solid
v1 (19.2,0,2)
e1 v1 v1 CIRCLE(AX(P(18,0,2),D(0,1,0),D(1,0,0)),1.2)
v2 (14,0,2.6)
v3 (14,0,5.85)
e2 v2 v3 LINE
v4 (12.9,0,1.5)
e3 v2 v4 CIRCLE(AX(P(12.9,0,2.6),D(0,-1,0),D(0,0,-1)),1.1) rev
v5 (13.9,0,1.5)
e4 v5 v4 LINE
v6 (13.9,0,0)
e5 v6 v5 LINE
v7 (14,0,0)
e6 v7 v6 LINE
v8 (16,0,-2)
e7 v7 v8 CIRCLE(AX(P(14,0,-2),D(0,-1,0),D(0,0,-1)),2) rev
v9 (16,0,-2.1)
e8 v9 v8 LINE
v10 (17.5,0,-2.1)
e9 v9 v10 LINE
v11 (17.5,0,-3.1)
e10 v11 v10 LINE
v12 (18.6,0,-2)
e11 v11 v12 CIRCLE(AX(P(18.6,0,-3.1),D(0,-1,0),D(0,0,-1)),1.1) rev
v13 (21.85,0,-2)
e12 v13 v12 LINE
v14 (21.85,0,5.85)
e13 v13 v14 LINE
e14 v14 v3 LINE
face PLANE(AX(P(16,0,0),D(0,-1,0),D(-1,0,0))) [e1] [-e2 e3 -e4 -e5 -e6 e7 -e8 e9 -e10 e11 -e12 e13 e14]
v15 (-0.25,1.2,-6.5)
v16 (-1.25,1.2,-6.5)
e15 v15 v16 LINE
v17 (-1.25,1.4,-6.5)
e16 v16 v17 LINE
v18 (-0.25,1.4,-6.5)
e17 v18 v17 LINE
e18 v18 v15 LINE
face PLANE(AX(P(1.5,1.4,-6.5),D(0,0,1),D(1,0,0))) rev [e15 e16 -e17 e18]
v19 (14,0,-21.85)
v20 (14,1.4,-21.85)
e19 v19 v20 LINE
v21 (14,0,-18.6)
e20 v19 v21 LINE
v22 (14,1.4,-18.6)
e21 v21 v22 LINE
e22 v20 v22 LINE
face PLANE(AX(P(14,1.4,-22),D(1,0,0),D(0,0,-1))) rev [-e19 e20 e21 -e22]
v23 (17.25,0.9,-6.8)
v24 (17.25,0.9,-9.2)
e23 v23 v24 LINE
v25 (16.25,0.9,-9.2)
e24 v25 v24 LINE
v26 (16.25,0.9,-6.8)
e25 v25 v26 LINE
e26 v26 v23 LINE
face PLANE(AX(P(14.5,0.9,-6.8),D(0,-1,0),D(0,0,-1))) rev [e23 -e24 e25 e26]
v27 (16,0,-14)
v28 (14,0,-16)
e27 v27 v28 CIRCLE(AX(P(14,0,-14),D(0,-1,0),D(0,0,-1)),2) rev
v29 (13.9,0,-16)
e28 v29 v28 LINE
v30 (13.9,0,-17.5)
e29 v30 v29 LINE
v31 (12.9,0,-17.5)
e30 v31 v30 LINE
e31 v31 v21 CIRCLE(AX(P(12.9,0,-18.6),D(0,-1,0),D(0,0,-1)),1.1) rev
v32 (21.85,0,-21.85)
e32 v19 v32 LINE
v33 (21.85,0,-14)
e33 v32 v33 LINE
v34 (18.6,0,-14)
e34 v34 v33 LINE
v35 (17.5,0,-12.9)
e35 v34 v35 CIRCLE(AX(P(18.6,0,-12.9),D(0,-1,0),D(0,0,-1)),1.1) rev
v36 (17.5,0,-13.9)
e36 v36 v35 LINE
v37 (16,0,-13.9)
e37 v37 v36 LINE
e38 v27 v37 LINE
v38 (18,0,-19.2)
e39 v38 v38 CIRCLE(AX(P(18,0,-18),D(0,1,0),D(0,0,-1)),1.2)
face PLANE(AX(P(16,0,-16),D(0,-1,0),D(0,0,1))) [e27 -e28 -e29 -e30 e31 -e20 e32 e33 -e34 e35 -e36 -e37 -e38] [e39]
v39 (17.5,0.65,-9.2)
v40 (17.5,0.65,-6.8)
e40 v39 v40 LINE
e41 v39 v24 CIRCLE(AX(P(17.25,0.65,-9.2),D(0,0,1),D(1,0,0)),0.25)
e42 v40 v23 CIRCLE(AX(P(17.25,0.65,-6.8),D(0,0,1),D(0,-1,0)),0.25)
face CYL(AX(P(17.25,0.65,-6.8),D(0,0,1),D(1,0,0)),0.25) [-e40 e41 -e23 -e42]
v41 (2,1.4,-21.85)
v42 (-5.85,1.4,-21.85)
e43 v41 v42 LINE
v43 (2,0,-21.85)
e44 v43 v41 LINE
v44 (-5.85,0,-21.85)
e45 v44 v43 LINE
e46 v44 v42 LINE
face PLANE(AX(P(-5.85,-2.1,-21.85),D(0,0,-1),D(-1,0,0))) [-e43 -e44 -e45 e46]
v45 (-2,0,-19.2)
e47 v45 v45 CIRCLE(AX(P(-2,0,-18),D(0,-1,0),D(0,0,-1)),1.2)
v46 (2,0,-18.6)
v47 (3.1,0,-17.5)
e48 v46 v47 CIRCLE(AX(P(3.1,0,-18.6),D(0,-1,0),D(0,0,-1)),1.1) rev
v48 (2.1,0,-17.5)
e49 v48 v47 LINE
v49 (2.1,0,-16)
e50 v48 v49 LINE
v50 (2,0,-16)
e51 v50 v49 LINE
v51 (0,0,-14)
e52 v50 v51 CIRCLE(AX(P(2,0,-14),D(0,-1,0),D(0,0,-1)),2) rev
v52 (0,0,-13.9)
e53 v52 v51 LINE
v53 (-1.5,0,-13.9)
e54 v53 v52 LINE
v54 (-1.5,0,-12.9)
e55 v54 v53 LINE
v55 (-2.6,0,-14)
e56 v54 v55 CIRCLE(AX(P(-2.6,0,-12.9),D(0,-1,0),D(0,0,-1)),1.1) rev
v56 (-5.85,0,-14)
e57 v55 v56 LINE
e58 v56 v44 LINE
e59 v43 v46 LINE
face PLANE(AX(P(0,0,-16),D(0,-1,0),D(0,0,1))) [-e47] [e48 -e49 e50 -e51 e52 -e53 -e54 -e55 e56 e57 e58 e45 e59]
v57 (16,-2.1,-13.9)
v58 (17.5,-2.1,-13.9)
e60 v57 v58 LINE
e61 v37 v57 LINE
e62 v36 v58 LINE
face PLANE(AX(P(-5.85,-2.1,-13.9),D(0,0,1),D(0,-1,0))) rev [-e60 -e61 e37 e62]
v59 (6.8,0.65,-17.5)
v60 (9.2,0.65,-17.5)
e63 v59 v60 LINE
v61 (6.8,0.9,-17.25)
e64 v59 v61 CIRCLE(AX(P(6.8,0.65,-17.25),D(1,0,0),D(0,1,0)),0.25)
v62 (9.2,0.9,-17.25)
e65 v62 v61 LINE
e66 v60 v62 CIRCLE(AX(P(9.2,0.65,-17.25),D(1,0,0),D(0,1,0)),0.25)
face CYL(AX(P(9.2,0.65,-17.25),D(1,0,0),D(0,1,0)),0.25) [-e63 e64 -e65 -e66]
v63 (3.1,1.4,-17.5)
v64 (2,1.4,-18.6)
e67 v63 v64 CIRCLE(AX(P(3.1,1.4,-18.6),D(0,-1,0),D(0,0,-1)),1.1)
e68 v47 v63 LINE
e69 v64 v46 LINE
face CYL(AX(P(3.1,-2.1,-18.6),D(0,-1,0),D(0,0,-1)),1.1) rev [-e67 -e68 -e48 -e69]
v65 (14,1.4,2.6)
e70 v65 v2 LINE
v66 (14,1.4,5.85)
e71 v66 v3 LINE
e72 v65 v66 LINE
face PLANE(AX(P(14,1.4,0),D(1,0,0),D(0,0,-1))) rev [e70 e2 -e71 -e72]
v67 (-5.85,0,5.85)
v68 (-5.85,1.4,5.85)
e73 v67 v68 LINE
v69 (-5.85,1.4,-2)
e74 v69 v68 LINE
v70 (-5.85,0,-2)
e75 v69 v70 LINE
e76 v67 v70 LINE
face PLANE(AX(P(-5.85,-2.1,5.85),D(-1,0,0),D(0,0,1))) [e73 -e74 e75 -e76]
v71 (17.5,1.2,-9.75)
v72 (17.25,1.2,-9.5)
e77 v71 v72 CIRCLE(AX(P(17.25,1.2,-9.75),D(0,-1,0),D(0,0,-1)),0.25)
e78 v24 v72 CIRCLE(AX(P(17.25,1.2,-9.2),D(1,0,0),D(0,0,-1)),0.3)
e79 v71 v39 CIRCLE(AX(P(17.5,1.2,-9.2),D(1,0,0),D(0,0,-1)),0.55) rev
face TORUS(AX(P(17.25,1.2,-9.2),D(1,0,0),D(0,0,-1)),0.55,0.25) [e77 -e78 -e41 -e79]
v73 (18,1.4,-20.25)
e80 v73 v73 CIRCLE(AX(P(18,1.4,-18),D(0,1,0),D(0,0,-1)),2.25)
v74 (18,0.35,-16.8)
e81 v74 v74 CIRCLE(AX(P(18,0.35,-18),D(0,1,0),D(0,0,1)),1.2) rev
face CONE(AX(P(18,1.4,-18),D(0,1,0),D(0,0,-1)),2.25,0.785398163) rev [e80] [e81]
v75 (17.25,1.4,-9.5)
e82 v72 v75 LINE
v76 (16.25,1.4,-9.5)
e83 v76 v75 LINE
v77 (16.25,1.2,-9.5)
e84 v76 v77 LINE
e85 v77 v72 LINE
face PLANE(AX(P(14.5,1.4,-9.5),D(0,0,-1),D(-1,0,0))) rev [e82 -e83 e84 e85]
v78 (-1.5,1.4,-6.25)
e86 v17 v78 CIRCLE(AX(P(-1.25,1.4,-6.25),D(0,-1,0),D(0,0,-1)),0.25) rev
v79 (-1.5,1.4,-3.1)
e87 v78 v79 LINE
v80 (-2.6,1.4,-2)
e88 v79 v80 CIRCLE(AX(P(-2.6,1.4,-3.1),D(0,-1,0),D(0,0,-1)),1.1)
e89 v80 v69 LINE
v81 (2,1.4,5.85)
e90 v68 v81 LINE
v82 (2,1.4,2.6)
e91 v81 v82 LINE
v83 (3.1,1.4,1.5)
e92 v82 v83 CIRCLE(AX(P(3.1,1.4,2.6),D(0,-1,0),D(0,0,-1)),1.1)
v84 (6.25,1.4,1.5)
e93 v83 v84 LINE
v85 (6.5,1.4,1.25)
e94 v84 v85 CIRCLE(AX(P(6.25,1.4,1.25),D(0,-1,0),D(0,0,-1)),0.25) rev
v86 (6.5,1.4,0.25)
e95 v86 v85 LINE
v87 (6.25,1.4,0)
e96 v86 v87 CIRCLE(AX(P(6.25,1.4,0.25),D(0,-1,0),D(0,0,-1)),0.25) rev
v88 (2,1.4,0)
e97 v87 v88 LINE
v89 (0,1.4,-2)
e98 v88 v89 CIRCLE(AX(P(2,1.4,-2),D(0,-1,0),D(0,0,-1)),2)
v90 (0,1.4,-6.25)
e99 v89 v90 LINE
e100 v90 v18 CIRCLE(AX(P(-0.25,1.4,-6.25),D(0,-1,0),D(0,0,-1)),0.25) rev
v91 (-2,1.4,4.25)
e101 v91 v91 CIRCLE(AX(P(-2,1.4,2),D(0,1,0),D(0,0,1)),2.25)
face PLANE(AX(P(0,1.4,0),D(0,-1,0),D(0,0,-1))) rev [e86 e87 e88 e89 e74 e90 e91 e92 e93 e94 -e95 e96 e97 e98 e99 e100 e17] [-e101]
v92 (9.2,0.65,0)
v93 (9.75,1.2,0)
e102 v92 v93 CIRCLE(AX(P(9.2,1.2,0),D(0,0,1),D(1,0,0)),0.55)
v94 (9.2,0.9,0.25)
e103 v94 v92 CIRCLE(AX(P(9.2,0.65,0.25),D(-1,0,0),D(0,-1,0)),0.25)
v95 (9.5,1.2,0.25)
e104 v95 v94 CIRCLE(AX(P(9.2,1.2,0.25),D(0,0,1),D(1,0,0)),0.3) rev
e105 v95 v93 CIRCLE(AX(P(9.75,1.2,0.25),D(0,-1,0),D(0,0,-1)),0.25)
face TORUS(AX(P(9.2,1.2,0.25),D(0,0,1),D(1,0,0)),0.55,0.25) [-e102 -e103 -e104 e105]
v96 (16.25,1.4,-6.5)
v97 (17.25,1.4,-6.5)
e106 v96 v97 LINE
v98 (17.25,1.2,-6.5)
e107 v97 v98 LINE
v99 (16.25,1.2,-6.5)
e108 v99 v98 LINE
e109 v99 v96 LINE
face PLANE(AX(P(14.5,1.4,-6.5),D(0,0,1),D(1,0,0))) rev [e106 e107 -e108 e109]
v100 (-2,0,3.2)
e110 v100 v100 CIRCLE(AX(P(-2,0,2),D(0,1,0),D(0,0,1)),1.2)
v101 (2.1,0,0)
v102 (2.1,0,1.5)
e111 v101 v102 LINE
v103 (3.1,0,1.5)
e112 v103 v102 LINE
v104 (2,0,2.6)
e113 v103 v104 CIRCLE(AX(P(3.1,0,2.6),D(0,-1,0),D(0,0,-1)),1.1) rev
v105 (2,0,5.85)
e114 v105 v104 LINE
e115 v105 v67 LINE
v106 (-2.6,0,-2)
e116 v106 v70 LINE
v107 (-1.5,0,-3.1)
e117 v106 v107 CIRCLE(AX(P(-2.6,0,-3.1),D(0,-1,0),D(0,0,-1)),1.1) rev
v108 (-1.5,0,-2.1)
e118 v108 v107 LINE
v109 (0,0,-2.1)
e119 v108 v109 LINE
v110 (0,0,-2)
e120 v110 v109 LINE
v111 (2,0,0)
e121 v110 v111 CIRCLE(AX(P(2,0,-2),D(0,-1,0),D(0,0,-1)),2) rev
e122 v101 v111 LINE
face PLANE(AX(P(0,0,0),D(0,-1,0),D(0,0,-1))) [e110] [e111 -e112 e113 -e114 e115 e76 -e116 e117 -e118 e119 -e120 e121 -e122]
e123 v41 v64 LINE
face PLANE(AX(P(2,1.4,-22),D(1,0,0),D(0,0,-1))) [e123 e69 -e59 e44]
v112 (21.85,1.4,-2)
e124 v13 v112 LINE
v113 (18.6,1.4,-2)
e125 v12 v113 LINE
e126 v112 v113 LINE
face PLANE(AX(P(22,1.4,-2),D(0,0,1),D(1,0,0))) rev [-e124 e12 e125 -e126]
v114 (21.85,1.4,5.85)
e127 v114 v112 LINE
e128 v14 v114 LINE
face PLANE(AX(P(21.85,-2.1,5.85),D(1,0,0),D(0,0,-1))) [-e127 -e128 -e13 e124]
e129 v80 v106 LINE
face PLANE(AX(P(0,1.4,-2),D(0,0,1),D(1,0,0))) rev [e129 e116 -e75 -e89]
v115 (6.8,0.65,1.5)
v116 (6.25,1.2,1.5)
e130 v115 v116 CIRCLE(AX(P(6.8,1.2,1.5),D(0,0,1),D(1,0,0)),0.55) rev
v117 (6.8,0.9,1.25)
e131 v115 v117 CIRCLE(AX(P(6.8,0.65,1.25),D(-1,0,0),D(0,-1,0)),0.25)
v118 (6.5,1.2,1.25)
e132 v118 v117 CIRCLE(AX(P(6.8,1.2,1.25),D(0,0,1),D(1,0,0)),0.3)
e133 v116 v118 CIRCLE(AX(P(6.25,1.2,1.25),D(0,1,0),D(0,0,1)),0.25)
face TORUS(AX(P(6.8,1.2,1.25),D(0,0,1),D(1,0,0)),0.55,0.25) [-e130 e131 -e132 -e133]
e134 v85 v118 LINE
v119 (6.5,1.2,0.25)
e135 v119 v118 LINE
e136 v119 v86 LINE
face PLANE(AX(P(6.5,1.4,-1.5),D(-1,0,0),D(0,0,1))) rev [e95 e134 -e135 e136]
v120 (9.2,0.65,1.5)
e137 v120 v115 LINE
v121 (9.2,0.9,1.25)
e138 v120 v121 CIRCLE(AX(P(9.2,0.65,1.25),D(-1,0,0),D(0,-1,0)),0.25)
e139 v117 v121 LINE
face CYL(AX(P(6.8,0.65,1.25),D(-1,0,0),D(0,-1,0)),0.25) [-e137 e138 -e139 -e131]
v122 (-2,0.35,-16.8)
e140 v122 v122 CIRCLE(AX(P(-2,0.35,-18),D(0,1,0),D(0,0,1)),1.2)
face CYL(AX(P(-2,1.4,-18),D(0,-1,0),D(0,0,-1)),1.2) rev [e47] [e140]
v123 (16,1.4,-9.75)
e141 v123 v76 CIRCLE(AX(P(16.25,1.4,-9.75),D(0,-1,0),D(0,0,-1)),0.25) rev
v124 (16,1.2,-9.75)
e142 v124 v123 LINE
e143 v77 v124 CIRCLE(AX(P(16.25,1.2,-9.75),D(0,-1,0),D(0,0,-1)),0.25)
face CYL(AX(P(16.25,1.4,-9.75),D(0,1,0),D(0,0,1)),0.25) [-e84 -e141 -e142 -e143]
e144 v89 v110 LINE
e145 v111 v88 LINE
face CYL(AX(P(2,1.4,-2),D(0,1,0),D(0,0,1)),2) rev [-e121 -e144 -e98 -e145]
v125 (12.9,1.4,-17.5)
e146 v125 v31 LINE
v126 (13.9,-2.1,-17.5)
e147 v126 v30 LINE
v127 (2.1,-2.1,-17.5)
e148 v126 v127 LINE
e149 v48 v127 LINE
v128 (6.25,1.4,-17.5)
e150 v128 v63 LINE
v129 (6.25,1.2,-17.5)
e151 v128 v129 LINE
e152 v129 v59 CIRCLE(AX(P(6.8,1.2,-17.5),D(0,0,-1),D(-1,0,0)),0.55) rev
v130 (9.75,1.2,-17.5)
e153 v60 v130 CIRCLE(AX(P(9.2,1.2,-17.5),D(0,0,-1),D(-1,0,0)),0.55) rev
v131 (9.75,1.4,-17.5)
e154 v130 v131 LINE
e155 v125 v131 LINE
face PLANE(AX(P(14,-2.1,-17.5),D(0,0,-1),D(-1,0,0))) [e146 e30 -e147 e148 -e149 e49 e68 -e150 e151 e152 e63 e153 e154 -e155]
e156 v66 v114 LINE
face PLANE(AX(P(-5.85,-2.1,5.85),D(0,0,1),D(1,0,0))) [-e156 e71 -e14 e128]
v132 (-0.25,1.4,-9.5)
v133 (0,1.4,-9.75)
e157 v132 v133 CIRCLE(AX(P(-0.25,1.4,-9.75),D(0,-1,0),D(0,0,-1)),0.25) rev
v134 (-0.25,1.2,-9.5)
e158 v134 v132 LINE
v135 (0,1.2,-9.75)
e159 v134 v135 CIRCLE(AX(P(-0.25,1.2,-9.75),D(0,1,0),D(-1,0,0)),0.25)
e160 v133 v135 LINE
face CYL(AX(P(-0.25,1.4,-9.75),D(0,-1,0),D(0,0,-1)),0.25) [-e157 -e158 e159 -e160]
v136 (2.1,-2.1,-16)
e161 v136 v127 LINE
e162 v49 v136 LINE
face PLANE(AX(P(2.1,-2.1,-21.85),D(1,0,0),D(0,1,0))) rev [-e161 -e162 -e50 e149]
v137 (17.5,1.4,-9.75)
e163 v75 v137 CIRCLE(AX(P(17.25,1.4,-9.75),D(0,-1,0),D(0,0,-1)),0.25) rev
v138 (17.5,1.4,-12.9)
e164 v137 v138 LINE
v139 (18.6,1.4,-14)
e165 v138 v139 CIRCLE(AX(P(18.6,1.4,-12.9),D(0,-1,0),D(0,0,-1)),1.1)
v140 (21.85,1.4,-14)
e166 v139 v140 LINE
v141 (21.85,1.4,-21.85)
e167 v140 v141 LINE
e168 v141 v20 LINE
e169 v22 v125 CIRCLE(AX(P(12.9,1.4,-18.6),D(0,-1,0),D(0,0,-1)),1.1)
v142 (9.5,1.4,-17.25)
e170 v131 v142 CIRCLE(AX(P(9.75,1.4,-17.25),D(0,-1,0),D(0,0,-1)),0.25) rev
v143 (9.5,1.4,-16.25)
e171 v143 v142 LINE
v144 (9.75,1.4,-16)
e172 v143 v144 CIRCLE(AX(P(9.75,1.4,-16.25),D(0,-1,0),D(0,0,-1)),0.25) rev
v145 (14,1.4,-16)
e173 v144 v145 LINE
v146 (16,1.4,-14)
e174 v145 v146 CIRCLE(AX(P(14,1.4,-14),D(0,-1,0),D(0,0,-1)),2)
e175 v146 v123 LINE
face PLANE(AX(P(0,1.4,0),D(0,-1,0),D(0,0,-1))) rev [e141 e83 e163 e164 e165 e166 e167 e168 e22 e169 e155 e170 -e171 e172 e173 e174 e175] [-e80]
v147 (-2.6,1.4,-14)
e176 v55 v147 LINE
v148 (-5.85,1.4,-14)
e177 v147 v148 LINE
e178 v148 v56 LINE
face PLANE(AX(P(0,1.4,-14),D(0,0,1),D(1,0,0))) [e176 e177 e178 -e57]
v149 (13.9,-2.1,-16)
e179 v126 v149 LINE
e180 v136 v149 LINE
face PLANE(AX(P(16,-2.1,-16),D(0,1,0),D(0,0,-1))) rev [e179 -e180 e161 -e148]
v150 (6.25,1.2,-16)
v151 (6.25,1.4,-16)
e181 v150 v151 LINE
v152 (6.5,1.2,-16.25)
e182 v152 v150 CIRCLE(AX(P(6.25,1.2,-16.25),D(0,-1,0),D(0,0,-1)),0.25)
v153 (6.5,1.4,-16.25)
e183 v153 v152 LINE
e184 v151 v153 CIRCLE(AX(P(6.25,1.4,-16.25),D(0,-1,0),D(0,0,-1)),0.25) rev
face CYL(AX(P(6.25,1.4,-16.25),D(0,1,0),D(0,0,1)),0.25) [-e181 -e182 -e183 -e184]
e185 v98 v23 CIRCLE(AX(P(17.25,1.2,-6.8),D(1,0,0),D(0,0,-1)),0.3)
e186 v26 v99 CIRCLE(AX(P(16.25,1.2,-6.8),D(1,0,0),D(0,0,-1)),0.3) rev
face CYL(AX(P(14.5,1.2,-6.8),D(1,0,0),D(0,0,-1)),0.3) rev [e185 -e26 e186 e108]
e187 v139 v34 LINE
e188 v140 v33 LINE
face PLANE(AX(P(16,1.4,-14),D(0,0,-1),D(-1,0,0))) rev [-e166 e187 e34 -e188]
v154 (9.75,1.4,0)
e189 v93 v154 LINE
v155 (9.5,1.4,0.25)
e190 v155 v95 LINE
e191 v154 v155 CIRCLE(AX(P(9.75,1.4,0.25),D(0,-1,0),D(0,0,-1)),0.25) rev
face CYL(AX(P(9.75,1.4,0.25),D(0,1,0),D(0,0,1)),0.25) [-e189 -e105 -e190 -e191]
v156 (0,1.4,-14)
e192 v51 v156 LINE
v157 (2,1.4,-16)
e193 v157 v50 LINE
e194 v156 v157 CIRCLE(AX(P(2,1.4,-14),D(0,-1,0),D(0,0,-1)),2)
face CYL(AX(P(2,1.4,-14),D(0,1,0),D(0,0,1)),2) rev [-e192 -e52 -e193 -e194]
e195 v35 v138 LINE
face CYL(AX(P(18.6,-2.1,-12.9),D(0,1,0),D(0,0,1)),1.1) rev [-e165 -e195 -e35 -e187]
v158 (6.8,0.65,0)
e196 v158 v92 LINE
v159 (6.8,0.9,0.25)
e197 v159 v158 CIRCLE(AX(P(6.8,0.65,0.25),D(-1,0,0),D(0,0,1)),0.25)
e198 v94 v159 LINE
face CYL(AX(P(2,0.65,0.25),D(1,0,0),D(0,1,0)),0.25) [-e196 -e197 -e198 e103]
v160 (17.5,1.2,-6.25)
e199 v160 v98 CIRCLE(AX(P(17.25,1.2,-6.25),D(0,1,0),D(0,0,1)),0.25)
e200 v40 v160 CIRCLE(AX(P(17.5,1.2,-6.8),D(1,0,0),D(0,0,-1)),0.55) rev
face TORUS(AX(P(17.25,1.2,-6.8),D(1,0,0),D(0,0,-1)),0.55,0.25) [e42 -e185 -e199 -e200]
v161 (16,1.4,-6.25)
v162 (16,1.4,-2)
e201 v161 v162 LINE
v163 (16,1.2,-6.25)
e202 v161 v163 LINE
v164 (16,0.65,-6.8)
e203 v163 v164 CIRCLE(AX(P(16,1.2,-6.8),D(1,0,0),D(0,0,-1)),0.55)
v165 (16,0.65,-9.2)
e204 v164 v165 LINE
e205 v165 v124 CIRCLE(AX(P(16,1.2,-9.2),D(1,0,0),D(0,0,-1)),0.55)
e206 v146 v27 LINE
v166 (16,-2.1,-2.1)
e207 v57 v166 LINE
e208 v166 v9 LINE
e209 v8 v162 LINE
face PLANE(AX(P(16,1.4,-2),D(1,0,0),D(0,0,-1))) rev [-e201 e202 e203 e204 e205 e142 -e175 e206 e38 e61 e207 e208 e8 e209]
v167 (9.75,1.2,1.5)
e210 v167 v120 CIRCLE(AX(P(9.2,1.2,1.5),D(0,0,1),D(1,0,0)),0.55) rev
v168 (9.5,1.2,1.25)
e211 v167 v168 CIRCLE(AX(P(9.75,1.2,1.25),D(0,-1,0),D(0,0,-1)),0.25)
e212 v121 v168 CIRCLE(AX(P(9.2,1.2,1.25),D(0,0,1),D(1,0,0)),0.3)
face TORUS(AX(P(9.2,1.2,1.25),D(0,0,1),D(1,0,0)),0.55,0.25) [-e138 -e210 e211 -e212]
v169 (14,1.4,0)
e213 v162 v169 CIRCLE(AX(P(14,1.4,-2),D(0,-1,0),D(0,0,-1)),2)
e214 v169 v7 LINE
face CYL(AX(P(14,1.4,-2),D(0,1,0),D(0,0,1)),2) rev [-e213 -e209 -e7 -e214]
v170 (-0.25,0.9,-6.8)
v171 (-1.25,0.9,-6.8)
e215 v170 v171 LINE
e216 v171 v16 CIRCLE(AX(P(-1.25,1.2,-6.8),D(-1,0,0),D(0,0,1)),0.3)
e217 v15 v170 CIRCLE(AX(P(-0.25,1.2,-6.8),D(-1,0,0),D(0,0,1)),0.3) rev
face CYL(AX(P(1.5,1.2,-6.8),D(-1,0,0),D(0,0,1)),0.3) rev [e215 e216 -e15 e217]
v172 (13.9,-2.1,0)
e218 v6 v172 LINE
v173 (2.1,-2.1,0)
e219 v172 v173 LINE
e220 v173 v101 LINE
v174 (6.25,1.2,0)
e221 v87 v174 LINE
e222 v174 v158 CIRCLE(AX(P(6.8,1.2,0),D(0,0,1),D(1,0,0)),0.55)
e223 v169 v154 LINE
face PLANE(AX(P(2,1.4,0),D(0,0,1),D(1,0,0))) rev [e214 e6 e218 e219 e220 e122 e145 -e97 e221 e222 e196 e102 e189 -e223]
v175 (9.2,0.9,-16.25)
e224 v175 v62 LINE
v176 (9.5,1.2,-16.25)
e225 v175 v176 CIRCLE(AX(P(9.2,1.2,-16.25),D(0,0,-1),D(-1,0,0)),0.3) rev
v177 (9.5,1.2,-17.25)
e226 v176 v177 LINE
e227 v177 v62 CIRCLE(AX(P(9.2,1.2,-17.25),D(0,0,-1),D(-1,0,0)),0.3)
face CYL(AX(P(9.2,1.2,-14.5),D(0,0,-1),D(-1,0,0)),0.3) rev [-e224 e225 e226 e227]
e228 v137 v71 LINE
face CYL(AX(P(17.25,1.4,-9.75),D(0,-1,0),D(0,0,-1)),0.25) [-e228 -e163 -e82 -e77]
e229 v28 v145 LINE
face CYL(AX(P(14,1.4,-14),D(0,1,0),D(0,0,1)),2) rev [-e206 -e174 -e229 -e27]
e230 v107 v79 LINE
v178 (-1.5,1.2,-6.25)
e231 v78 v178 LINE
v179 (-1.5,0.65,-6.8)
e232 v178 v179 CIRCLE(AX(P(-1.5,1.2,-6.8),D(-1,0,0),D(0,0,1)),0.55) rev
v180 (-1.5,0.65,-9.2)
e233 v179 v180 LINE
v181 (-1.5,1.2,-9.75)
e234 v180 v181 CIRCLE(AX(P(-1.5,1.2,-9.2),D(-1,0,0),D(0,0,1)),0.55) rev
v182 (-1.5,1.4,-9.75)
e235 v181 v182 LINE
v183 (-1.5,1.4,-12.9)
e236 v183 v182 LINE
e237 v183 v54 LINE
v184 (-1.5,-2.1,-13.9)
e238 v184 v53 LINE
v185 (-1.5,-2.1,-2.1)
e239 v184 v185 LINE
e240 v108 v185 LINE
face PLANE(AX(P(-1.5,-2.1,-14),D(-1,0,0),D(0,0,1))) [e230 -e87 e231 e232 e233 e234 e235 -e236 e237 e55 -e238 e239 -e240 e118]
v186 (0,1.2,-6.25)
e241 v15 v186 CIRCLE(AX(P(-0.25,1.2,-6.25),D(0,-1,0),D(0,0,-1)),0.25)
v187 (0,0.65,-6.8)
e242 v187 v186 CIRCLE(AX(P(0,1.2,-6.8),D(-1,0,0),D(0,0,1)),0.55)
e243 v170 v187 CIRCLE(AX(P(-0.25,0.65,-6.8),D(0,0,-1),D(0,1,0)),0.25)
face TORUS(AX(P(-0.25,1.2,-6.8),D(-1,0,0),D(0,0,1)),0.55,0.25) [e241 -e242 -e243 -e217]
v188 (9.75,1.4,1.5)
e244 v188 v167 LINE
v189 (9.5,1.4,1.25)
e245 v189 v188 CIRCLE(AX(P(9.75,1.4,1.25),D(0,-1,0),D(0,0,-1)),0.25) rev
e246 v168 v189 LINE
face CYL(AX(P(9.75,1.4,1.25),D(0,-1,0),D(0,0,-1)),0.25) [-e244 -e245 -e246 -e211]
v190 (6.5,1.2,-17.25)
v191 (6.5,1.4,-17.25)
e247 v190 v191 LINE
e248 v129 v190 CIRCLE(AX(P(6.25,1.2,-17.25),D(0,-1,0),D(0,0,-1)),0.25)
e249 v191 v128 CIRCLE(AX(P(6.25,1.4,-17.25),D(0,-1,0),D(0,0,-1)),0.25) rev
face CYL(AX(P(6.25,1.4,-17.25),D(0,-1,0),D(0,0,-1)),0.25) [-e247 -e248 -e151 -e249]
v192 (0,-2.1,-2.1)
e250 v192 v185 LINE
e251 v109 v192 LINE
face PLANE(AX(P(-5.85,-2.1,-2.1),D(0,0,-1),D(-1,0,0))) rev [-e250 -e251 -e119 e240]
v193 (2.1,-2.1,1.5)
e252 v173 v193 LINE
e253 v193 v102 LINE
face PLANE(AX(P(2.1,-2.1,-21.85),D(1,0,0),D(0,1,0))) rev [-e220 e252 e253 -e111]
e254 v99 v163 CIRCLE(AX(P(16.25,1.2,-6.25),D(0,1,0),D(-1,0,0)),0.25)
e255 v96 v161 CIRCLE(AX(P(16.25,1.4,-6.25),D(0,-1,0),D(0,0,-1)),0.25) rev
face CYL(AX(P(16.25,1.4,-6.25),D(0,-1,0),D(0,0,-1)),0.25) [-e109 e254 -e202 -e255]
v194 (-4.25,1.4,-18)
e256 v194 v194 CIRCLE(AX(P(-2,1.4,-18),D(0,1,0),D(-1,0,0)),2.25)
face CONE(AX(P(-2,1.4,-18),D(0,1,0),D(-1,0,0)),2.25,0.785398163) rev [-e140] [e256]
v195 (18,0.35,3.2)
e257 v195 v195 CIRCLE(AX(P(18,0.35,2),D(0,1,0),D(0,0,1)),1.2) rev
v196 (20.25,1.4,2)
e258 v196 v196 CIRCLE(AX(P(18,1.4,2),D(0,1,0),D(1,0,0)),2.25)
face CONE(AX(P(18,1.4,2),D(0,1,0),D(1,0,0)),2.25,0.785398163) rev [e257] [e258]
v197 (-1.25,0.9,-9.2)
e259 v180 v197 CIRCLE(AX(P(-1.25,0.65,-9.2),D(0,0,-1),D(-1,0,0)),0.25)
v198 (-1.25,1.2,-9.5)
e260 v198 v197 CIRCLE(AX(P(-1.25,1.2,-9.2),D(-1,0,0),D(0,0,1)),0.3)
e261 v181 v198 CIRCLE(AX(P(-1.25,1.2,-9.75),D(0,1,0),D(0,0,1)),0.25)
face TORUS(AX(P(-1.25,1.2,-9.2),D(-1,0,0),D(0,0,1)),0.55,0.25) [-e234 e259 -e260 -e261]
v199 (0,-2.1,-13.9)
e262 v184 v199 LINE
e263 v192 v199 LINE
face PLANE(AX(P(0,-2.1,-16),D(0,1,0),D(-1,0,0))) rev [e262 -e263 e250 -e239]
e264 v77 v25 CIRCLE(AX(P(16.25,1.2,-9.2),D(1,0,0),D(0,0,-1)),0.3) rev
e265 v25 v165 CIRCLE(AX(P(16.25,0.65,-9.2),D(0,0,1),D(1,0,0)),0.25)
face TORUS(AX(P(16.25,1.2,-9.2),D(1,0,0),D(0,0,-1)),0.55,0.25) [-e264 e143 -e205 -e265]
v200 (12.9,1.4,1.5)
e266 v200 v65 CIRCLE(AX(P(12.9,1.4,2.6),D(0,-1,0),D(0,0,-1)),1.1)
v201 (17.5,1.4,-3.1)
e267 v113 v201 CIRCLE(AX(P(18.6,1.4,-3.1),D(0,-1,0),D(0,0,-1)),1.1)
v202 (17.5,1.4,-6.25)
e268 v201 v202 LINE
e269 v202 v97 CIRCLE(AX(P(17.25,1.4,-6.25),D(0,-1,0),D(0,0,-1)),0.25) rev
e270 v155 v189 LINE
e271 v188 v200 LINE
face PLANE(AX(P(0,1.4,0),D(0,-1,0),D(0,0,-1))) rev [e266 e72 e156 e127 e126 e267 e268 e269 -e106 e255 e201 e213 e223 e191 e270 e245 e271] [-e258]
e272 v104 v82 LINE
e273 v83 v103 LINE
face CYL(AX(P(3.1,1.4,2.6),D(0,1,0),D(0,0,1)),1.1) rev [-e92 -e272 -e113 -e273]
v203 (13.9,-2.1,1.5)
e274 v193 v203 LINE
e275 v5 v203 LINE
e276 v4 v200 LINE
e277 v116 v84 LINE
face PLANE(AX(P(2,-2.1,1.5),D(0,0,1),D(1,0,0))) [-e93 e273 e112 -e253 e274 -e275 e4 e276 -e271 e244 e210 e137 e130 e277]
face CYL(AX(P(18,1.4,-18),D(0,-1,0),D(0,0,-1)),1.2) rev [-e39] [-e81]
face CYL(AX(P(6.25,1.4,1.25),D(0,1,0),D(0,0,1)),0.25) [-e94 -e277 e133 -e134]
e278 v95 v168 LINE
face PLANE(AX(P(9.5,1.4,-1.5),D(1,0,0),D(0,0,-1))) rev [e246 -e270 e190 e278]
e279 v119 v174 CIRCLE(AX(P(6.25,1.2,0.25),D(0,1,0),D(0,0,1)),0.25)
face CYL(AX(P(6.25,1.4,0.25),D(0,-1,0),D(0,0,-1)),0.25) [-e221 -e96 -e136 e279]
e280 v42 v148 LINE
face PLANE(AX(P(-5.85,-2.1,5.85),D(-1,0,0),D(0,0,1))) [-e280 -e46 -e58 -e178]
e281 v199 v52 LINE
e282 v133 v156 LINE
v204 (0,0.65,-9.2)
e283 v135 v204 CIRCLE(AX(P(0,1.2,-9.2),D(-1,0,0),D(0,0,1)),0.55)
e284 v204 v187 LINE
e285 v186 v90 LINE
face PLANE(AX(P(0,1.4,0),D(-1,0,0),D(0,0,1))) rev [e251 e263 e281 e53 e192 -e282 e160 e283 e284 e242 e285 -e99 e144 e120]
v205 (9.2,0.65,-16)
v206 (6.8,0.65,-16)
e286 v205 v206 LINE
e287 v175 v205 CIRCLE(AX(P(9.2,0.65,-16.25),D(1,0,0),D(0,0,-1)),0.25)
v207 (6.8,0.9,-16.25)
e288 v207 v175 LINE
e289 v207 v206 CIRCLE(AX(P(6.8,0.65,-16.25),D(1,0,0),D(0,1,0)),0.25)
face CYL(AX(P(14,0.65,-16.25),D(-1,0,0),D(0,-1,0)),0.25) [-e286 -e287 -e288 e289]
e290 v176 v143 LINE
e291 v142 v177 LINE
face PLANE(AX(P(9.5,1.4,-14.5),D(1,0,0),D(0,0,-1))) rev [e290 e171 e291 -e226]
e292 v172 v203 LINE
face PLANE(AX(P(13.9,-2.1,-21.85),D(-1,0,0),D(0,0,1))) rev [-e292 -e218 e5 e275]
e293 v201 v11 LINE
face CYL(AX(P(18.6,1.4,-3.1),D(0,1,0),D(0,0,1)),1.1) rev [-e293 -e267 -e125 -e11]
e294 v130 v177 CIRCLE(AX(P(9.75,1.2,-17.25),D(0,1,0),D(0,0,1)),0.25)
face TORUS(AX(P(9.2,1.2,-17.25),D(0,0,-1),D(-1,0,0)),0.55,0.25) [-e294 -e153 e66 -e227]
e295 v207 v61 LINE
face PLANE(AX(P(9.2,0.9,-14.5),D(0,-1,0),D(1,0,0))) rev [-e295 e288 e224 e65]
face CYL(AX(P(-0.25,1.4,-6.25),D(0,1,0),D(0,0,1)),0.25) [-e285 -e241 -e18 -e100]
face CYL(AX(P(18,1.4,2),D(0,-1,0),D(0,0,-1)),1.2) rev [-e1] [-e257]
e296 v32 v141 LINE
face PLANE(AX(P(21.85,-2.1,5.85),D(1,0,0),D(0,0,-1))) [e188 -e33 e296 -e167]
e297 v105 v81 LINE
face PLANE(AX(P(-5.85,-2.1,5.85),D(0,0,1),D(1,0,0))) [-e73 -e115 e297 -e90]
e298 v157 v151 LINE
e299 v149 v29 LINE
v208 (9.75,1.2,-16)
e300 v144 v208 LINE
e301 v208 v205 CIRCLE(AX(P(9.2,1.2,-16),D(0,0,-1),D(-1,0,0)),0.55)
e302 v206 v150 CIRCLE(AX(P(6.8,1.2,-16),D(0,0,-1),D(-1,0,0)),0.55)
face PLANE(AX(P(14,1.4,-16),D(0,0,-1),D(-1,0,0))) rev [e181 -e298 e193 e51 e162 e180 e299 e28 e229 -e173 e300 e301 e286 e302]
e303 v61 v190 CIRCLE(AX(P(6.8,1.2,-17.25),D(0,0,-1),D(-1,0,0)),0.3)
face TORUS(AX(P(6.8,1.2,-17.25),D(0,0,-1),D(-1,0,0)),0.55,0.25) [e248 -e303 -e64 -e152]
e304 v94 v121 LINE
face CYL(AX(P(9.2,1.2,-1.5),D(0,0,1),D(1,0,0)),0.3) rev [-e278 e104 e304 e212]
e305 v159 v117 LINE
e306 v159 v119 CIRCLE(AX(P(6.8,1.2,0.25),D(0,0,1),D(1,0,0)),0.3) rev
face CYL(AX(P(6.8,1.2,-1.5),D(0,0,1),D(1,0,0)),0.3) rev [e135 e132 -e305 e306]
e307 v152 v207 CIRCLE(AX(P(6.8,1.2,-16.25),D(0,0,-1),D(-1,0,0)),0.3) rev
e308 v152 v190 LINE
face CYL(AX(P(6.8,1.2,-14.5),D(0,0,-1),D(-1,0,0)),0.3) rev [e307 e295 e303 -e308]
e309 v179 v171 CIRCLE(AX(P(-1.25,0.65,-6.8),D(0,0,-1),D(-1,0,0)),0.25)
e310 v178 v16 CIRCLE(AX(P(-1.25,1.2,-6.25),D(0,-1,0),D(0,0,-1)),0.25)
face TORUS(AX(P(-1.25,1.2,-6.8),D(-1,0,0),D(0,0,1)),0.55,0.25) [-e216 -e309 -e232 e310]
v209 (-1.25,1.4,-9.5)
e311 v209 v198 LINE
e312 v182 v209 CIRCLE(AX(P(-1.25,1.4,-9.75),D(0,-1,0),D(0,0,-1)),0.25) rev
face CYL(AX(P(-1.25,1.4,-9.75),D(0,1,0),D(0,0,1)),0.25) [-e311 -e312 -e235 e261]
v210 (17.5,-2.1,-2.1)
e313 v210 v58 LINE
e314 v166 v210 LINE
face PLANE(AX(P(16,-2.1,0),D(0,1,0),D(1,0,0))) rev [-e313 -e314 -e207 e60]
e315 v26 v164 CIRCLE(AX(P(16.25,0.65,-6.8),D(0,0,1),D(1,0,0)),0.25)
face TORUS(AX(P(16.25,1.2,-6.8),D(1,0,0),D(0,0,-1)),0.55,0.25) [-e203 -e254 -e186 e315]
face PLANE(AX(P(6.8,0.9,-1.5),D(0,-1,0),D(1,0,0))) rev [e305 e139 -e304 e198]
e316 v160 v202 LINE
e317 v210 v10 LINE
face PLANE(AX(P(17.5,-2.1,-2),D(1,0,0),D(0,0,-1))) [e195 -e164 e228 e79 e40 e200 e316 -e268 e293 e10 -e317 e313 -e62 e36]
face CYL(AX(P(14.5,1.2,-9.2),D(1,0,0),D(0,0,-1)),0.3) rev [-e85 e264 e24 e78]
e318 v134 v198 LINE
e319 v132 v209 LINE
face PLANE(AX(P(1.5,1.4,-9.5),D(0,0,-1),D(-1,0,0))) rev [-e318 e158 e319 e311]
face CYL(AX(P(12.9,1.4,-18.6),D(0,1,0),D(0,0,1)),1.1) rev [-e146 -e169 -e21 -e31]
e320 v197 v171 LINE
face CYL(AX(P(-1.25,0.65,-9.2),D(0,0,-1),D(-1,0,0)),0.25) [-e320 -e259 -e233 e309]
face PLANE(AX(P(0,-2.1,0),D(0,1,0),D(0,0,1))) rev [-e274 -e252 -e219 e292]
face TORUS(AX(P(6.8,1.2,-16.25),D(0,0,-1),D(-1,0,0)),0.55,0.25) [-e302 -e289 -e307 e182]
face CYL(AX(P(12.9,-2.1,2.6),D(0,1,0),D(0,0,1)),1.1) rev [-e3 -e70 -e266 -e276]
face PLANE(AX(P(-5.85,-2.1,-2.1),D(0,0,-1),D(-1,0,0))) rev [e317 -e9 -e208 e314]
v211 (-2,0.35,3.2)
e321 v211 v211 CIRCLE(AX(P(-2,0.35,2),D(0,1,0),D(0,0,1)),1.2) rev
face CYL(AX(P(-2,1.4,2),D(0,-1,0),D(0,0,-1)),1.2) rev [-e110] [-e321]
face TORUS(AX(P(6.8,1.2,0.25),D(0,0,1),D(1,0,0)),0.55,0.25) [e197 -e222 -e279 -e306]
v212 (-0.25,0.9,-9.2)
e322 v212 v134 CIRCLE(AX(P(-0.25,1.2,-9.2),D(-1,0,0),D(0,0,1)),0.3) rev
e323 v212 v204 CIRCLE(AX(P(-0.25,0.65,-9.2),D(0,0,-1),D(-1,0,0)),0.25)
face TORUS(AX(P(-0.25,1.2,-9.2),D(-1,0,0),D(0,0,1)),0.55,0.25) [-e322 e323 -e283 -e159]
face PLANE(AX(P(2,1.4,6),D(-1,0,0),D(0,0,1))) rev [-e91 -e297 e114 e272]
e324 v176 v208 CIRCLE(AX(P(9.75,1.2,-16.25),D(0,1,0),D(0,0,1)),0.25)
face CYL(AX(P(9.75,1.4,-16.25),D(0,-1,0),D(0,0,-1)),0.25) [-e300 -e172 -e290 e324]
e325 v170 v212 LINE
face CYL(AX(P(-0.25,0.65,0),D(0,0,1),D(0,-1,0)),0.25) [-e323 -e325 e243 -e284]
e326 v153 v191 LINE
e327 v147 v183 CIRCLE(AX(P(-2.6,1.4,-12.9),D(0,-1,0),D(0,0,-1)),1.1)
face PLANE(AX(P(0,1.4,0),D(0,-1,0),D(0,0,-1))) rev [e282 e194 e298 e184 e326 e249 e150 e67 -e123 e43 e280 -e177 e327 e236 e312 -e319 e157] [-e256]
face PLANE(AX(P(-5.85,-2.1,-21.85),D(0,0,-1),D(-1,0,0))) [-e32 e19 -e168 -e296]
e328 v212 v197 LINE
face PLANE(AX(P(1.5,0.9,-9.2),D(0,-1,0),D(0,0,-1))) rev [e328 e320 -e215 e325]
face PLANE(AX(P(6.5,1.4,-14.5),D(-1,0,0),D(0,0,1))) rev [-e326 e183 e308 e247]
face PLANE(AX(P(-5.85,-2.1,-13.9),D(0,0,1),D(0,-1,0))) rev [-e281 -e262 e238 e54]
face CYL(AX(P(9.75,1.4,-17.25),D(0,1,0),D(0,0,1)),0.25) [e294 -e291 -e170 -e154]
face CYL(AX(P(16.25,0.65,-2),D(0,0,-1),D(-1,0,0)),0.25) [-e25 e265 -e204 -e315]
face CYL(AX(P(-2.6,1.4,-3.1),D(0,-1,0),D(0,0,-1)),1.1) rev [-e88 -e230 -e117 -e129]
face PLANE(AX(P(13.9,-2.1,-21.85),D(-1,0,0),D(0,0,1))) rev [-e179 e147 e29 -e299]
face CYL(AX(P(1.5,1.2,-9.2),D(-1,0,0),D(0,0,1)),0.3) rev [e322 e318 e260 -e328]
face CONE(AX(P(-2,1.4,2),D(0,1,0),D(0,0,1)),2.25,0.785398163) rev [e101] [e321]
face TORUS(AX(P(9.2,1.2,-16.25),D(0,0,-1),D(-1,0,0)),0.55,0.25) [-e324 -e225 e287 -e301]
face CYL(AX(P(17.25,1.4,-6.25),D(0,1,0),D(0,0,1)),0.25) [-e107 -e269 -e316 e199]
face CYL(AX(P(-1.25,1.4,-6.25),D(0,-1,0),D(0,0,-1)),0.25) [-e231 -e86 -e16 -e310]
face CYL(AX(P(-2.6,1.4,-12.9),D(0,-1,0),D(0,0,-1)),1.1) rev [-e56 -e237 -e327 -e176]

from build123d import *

# Parameters (mm, degrees)
SKETCH1_R                   = 1.2
BOSS_EXTRUDE1_DEPTH         = 1.4
SKETCH2_R                   = 2.25
CUT_EXTRUDE1_DEPTH          = 1.1
CUT_EXTRUDE1_DRAFT          = -45
SKETCH3_W                   = 12
SKETCH3_H                   = 1.5
BOSS_EXTRUDE2_DEPTH         = 3.5
CIRPATTERN1_COUNT           = 2
CIRPATTERN1_ANGLE           = 90
CIRPATTERN1_COPY_1_SKETCH_R = 2.25
CIRPATTERN1_COPY_1_DEPTH    = 1.1
CIRPATTERN1_COPY_1_DRAFT    = -45
CIRPATTERN2_START           = -14
CIRPATTERN2_OUTLINE_W       = 1.5
CIRPATTERN2_OUTLINE_H       = 3.5
CIRPATTERN2_DEPTH           = 12
CIRPATTERN2_2_OUTLINE_R     = 1.2
CIRPATTERN2_2_DEPTH         = 1.4
CIRPATTERN2_START_2         = -2.1
CIRPATTERN2_3_OUTLINE_W     = 12
CIRPATTERN2_3_OUTLINE_H     = 1.5
CIRPATTERN2_3_DEPTH         = 2.1
CIRPATTERN3_COPY_1_SKETCH_R = 2.25
CIRPATTERN3_COPY_1_DEPTH    = 1.1
CIRPATTERN3_COPY_1_DRAFT    = -45
CIRPATTERN3_COPY_2_SKETCH_R = 2.25
CIRPATTERN3_COPY_2_DEPTH    = 1.1
CIRPATTERN3_COPY_2_DRAFT    = -45
CIRPATTERN3_COPY_3_SKETCH_R = 2.25
CIRPATTERN3_COPY_3_DEPTH    = 1.1
CIRPATTERN3_COPY_3_DRAFT    = -45
CUT_EXTRUDE2_DEPTH          = 3
CIRPATTERN4_COUNT           = 4
FILLET2_R                   = 0.25
CUT_EXTRUDE3_DEPTH          = 32.183489221
CUT_EXTRUDE3_DEPTH_BACK     = 32.183489221
SKETCH5_W                   = 28
SKETCH5_H                   = 28
SKETCH5_W_2                 = 27.7
SKETCH5_H_2                 = 27.7
FILLET3_R                   = 2
FILLET4_R                   = 1.1
CUT_EXTRUDE4_DEPTH          = 31.97184205
CUT_EXTRUDE4_DEPTH_BACK     = 31.97184205
SKETCH6_W                   = 0.1
SKETCH6_H                   = 2.1
CUT_EXTRUDE5_DEPTH          = 31.97184205
CUT_EXTRUDE5_DEPTH_BACK     = 31.97184205
SKETCH7_W                   = 0.1
SKETCH7_H                   = 2.1


# Read off the part's stored shape, not the designer's step: CirPattern2
with BuildPart() as part:
    # Sketch1 → Boss-Extrude1 (new body)
    with BuildSketch(Plane(origin=(0, 0, 0), x_dir=(1, 0, 0), z_dir=(0, 1, 0))):
        Polygon((0, 0), (0, 2), (-6, 2), (-6, -6), (2, -6), (2, 0), align=None)
        with Locations(Location((-2, -2, 0), (0, 0, 270))):
            Circle(SKETCH1_R, mode=Mode.SUBTRACT)
    boss_extrude1 = extrude(amount=BOSS_EXTRUDE1_DEPTH)


with BuildPart() as cut_extrude1_tool:
    # Sketch2 → Cut-Extrude1 (with draft: the straight prism first)
    with BuildSketch(Plane(origin=(0, 1.4, 0), x_dir=(1, 0, 0), z_dir=(0, 1, 0))):
        with Locations((-2, -2)):
            Circle(SKETCH2_R)
    extrude(amount=-CUT_EXTRUDE1_DEPTH)
    # Cut-Extrude1: the draft: its side faces are tilted about the plane it starts from
    cut_extrude1_sides = [cut_extrude1_tool.faces().sort_by_distance(p)[0] for p in [
        (-4.25, 0.85, 2),
    ]]
    draft(cut_extrude1_sides, Plane(origin=(0, 1.4, 0), x_dir=(1, 0, 0), z_dir=(0, 1, 0)), CUT_EXTRUDE1_DRAFT)


with BuildPart() as part_1:
    add(part.part)

    # Cut-Extrude1: cut by cut_extrude1_tool
    add(cut_extrude1_tool.part, mode=Mode.SUBTRACT)

    # Sketch3 → Boss-Extrude2 (add)
    with BuildSketch(Plane(origin=(0, 1.4, 0), x_dir=(1, 0, 0), z_dir=(0, 1, 0))):
        with Locations((8, -0.75)):
            Rectangle(SKETCH3_W, SKETCH3_H)
    boss_extrude2 = extrude(amount=-BOSS_EXTRUDE2_DEPTH)

    # CirPattern1: Boss-Extrude1, Boss-Extrude2 ×2 about axis
    cirpattern1_axis = Axis((8, 0, -8), (0, 1, 0))
    add([boss_extrude1.rotate(cirpattern1_axis, i * CIRPATTERN1_ANGLE / (CIRPATTERN1_COUNT - 1)) for i in range(1, CIRPATTERN1_COUNT)])
    add([boss_extrude2.rotate(cirpattern1_axis, i * CIRPATTERN1_ANGLE / (CIRPATTERN1_COUNT - 1)) for i in range(1, CIRPATTERN1_COUNT)])


with BuildPart() as cirpattern1_copy_1_tool:
    # CirPattern1 copy 1 sketch → CirPattern1 copy 1 (with draft: the straight prism first)
    with BuildSketch(Plane(origin=(16, 1.4, 0), x_dir=(0, 0, -1), z_dir=(0, 1, 0))):
        with Locations((-2, -2)):
            Circle(CIRPATTERN1_COPY_1_SKETCH_R)
    extrude(amount=-CIRPATTERN1_COPY_1_DEPTH)
    # CirPattern1 copy 1: the draft: its side faces are tilted about the plane it starts from
    cirpattern1_copy_1_sides = [cirpattern1_copy_1_tool.faces().sort_by_distance(p)[0] for p in [
        (18, 0.85, 4.25),
    ]]
    draft(cirpattern1_copy_1_sides, Plane(origin=(16, 1.4, 0), x_dir=(0, 0, -1), z_dir=(0, 1, 0)), CIRPATTERN1_COPY_1_DRAFT)


with BuildPart() as part_2:
    add(part_1.part)

    # CirPattern1 copy 1: cut by cirpattern1_copy_1_tool
    add(cirpattern1_copy_1_tool.part, mode=Mode.SUBTRACT)

    # CirPattern2 outline → CirPattern2 (add)
    with BuildSketch(Plane.XY.offset(CIRPATTERN2_START)):
        with Locations((-0.75, -0.35)):
            Rectangle(CIRPATTERN2_OUTLINE_W, CIRPATTERN2_OUTLINE_H)
    extrude(amount=CIRPATTERN2_DEPTH)

    # CirPattern2 2 outline → CirPattern2 2 (add)
    with BuildSketch(Plane(origin=(0, 0, 0), x_dir=(1, 0, 0), z_dir=(0, 1, 0))):
        Polygon((2, 16), (16, 16), (16, 14), (22, 14), (22, 22), (14, 22), (14, 17.5), (2, 17.5), align=None)
        with Locations((18, 18)):
            Circle(CIRPATTERN2_2_OUTLINE_R, mode=Mode.SUBTRACT)
    extrude(amount=CIRPATTERN2_2_DEPTH)

    # CirPattern2 3 outline → CirPattern2 3 (add)
    with BuildSketch(Plane(origin=(0, 0, 0), x_dir=(1, 0, 0), z_dir=(0, 1, 0)).offset(CIRPATTERN2_START_2)):
        with Locations((8, 16.75)):
            Rectangle(CIRPATTERN2_3_OUTLINE_W, CIRPATTERN2_3_OUTLINE_H)
    extrude(amount=CIRPATTERN2_3_DEPTH)

    # CirPattern2 4 outline → CirPattern2 4 (revolve)
    with BuildSketch(Plane(origin=(18, 0, 2), x_dir=(1, 0, 0), z_dir=(0, 0, 1))):
        Polygon((1.2, 1.4), (1.2, 0.35), (2.25, 1.4), align=None)
    revolve(axis=Axis((18, 0, 2), (0, 1, 0)))

    # Mirror1: Boss-Extrude1 across plane
    add(boss_extrude1.mirror(Plane(origin=(0, 0, -8), x_dir=(1, 0, 0), z_dir=(0, 0, -1))))


with BuildPart() as cirpattern3_copy_1_tool:
    # CirPattern3 copy 1 sketch → CirPattern3 copy 1 (with draft: the straight prism first)
    with BuildSketch(Plane(origin=(16, 1.4, 0), x_dir=(0, 0, -1), z_dir=(0, 1, 0))):
        with Locations((-2, -2)):
            Circle(CIRPATTERN3_COPY_1_SKETCH_R)
    extrude(amount=-CIRPATTERN3_COPY_1_DEPTH)
    # CirPattern3 copy 1: the draft: its side faces are tilted about the plane it starts from
    cirpattern3_copy_1_sides = [cirpattern3_copy_1_tool.faces().sort_by_distance(p)[0] for p in [
        (18, 0.85, 4.25),
    ]]
    draft(cirpattern3_copy_1_sides, Plane(origin=(16, 1.4, 0), x_dir=(0, 0, -1), z_dir=(0, 1, 0)), CIRPATTERN3_COPY_1_DRAFT)


with BuildPart() as part_3:
    add(part_2.part)

    # CirPattern3 copy 1: cut by cirpattern3_copy_1_tool
    add(cirpattern3_copy_1_tool.part, mode=Mode.SUBTRACT)


with BuildPart() as cirpattern3_copy_2_tool:
    # CirPattern3 copy 2 sketch → CirPattern3 copy 2 (with draft: the straight prism first)
    with BuildSketch(Plane(origin=(16, 1.4, -16), x_dir=(-1, 0, 0), z_dir=(0, 1, 0))):
        with Locations((-2, -2)):
            Circle(CIRPATTERN3_COPY_2_SKETCH_R)
    extrude(amount=-CIRPATTERN3_COPY_2_DEPTH)
    # CirPattern3 copy 2: the draft: its side faces are tilted about the plane it starts from
    cirpattern3_copy_2_sides = [cirpattern3_copy_2_tool.faces().sort_by_distance(p)[0] for p in [
        (20.25, 0.85, -18),
    ]]
    draft(cirpattern3_copy_2_sides, Plane(origin=(16, 1.4, -16), x_dir=(-1, 0, 0), z_dir=(0, 1, 0)), CIRPATTERN3_COPY_2_DRAFT)


with BuildPart() as part_4:
    add(part_3.part)

    # CirPattern3 copy 2: cut by cirpattern3_copy_2_tool
    add(cirpattern3_copy_2_tool.part, mode=Mode.SUBTRACT)


with BuildPart() as cirpattern3_copy_3_tool:
    # CirPattern3 copy 3 sketch → CirPattern3 copy 3 (with draft: the straight prism first)
    with BuildSketch(Plane(origin=(0, 1.4, -16), x_dir=(0, 0, 1), z_dir=(0, 1, 0))):
        with Locations((-2, -2)):
            Circle(CIRPATTERN3_COPY_3_SKETCH_R)
    extrude(amount=-CIRPATTERN3_COPY_3_DEPTH)
    # CirPattern3 copy 3: the draft: its side faces are tilted about the plane it starts from
    cirpattern3_copy_3_sides = [cirpattern3_copy_3_tool.faces().sort_by_distance(p)[0] for p in [
        (-2, 0.85, -20.25),
    ]]
    draft(cirpattern3_copy_3_sides, Plane(origin=(0, 1.4, -16), x_dir=(0, 0, 1), z_dir=(0, 1, 0)), CIRPATTERN3_COPY_3_DRAFT)


with BuildPart() as part_5:
    add(part_4.part)

    # CirPattern3 copy 3: cut by cirpattern3_copy_3_tool
    add(cirpattern3_copy_3_tool.part, mode=Mode.SUBTRACT)

    # Sketch4 → Cut-Extrude2 (cut)
    with BuildSketch(Plane.XY.offset(1.5)):
        with BuildLine():
            Line((6.5, 1.4), (9.5, 1.4))
            Line((9.5, 1.4), (9.5, 1.2))
            ThreePointArc((9.5, 1.2), (9.412132034, 0.987867966), (9.2, 0.9))
            Line((9.2, 0.9), (6.8, 0.9))
            ThreePointArc((6.8, 0.9), (6.587867966, 0.987867966), (6.5, 1.2))
            Line((6.5, 1.2), (6.5, 1.4))
        make_face()
    cut_extrude2 = extrude(amount=-CUT_EXTRUDE2_DEPTH, mode=Mode.SUBTRACT)

    # CirPattern4: Cut-Extrude2 ×4 about axis
    cirpattern4_axis = Axis((8, 0, -8), (0, 1, 0))
    for i in range(1, CIRPATTERN4_COUNT):
        add(cut_extrude2.rotate(cirpattern4_axis, i * 360 / CIRPATTERN4_COUNT), mode=Mode.SUBTRACT)

    # Fillet2
    fillet2_edges = [part_5.edges().sort_by_distance(p)[0] for p in [
        (6.5, 1.3, 0),
        (9.5, 1.3, 0),
        (9.412132034, 0.987867966, 0),
        (8, 0.9, 0),
        (6.587867966, 0.987867966, 0),
        (6.5, 1.3, 1.5),
        (6.587867966, 0.987867966, 1.5),
        (8, 0.9, 1.5),
        (9.412132034, 0.987867966, 1.5),
        (9.5, 1.3, 1.5),
        (16, 1.3, -6.5),
        (16, 1.3, -9.5),
        (16, 0.987867966, -9.412132034),
        (16, 0.9, -8),
        (16, 0.987867966, -6.587867966),
        (17.5, 1.3, -6.5),
        (17.5, 0.987867966, -6.587867966),
        (17.5, 0.9, -8),
        (17.5, 0.987867966, -9.412132034),
        (17.5, 1.3, -9.5),
        (9.5, 1.3, -16),
        (6.5, 1.3, -16),
        (6.587867966, 0.987867966, -16),
        (8, 0.9, -16),
        (9.412132034, 0.987867966, -16),
        (9.5, 1.3, -17.5),
        (9.412132034, 0.987867966, -17.5),
        (8, 0.9, -17.5),
        (6.587867966, 0.987867966, -17.5),
        (6.5, 1.3, -17.5),
        (0, 1.3, -9.5),
        (0, 1.3, -6.5),
        (0, 0.987867966, -6.587867966),
        (0, 0.9, -8),
        (0, 0.987867966, -9.412132034),
        (-1.5, 1.3, -9.5),
        (-1.5, 0.987867966, -9.412132034),
        (-1.5, 0.9, -8),
        (-1.5, 0.987867966, -6.587867966),
        (-1.5, 1.3, -6.5),
    ]]
    fillet(fillet2_edges, radius=FILLET2_R)

    # Sketch5 → Cut-Extrude3 (cut, two sides: drawn at the far end of the back side and taken through both)
    with BuildSketch(Plane(origin=(0, 0, 0), x_dir=(1, 0, 0), z_dir=(0, 1, 0)).offset(-CUT_EXTRUDE3_DEPTH_BACK)):
        with Locations((8, 8)):
            Rectangle(SKETCH5_W, SKETCH5_H)
        with Locations((8, 8)):
            Rectangle(SKETCH5_W_2, SKETCH5_H_2, mode=Mode.SUBTRACT)
    extrude(amount=CUT_EXTRUDE3_DEPTH + CUT_EXTRUDE3_DEPTH_BACK, mode=Mode.SUBTRACT)

    # Fillet3
    fillet3_edges = [part_5.edges().sort_by_distance(p)[0] for p in [
        (16, 0.7, -16),
        (0, 0.7, 0),
        (0, 0.7, -16),
        (16, 0.7, 0),
    ]]
    fillet(fillet3_edges, radius=FILLET3_R)

    # Fillet4
    fillet4_edges = [part_5.edges().sort_by_distance(p)[0] for p in [
        (17.5, 0.7, -14),
        (14, 0.7, -17.5),
        (-1.5, 0.7, -2),
        (-1.5, 0.7, -14),
        (2, 0.7, -17.5),
        (2, 0.7, 1.5),
        (14, 0.7, 1.5),
        (17.5, 0.7, -2),
    ]]
    fillet(fillet4_edges, radius=FILLET4_R)

    # Sketch6 → Cut-Extrude4 (cut, two sides: drawn at the far end of the back side and taken through both)
    with BuildSketch(Plane.XY.offset(-CUT_EXTRUDE4_DEPTH_BACK)):
        with Locations((13.95, -1.05)):
            Rectangle(SKETCH6_W, SKETCH6_H)
        with Locations((2.05, -1.05)):
            Rectangle(SKETCH6_W, SKETCH6_H)
    extrude(amount=CUT_EXTRUDE4_DEPTH + CUT_EXTRUDE4_DEPTH_BACK, mode=Mode.SUBTRACT)

    # Sketch7 → Cut-Extrude5 (cut, two sides: drawn at the far end of the back side and taken through both)
    with BuildSketch(Plane(origin=(0, 0, 0), x_dir=(0, 0, -1), z_dir=(1, 0, 0)).offset(-CUT_EXTRUDE5_DEPTH_BACK)):
        with Locations((2.05, -1.05)):
            Rectangle(SKETCH7_W, SKETCH7_H)
        with Locations((13.95, -1.05)):
            Rectangle(SKETCH7_W, SKETCH7_H)
    extrude(amount=CUT_EXTRUDE5_DEPTH + CUT_EXTRUDE5_DEPTH_BACK, mode=Mode.SUBTRACT)


solid = part_5.part
